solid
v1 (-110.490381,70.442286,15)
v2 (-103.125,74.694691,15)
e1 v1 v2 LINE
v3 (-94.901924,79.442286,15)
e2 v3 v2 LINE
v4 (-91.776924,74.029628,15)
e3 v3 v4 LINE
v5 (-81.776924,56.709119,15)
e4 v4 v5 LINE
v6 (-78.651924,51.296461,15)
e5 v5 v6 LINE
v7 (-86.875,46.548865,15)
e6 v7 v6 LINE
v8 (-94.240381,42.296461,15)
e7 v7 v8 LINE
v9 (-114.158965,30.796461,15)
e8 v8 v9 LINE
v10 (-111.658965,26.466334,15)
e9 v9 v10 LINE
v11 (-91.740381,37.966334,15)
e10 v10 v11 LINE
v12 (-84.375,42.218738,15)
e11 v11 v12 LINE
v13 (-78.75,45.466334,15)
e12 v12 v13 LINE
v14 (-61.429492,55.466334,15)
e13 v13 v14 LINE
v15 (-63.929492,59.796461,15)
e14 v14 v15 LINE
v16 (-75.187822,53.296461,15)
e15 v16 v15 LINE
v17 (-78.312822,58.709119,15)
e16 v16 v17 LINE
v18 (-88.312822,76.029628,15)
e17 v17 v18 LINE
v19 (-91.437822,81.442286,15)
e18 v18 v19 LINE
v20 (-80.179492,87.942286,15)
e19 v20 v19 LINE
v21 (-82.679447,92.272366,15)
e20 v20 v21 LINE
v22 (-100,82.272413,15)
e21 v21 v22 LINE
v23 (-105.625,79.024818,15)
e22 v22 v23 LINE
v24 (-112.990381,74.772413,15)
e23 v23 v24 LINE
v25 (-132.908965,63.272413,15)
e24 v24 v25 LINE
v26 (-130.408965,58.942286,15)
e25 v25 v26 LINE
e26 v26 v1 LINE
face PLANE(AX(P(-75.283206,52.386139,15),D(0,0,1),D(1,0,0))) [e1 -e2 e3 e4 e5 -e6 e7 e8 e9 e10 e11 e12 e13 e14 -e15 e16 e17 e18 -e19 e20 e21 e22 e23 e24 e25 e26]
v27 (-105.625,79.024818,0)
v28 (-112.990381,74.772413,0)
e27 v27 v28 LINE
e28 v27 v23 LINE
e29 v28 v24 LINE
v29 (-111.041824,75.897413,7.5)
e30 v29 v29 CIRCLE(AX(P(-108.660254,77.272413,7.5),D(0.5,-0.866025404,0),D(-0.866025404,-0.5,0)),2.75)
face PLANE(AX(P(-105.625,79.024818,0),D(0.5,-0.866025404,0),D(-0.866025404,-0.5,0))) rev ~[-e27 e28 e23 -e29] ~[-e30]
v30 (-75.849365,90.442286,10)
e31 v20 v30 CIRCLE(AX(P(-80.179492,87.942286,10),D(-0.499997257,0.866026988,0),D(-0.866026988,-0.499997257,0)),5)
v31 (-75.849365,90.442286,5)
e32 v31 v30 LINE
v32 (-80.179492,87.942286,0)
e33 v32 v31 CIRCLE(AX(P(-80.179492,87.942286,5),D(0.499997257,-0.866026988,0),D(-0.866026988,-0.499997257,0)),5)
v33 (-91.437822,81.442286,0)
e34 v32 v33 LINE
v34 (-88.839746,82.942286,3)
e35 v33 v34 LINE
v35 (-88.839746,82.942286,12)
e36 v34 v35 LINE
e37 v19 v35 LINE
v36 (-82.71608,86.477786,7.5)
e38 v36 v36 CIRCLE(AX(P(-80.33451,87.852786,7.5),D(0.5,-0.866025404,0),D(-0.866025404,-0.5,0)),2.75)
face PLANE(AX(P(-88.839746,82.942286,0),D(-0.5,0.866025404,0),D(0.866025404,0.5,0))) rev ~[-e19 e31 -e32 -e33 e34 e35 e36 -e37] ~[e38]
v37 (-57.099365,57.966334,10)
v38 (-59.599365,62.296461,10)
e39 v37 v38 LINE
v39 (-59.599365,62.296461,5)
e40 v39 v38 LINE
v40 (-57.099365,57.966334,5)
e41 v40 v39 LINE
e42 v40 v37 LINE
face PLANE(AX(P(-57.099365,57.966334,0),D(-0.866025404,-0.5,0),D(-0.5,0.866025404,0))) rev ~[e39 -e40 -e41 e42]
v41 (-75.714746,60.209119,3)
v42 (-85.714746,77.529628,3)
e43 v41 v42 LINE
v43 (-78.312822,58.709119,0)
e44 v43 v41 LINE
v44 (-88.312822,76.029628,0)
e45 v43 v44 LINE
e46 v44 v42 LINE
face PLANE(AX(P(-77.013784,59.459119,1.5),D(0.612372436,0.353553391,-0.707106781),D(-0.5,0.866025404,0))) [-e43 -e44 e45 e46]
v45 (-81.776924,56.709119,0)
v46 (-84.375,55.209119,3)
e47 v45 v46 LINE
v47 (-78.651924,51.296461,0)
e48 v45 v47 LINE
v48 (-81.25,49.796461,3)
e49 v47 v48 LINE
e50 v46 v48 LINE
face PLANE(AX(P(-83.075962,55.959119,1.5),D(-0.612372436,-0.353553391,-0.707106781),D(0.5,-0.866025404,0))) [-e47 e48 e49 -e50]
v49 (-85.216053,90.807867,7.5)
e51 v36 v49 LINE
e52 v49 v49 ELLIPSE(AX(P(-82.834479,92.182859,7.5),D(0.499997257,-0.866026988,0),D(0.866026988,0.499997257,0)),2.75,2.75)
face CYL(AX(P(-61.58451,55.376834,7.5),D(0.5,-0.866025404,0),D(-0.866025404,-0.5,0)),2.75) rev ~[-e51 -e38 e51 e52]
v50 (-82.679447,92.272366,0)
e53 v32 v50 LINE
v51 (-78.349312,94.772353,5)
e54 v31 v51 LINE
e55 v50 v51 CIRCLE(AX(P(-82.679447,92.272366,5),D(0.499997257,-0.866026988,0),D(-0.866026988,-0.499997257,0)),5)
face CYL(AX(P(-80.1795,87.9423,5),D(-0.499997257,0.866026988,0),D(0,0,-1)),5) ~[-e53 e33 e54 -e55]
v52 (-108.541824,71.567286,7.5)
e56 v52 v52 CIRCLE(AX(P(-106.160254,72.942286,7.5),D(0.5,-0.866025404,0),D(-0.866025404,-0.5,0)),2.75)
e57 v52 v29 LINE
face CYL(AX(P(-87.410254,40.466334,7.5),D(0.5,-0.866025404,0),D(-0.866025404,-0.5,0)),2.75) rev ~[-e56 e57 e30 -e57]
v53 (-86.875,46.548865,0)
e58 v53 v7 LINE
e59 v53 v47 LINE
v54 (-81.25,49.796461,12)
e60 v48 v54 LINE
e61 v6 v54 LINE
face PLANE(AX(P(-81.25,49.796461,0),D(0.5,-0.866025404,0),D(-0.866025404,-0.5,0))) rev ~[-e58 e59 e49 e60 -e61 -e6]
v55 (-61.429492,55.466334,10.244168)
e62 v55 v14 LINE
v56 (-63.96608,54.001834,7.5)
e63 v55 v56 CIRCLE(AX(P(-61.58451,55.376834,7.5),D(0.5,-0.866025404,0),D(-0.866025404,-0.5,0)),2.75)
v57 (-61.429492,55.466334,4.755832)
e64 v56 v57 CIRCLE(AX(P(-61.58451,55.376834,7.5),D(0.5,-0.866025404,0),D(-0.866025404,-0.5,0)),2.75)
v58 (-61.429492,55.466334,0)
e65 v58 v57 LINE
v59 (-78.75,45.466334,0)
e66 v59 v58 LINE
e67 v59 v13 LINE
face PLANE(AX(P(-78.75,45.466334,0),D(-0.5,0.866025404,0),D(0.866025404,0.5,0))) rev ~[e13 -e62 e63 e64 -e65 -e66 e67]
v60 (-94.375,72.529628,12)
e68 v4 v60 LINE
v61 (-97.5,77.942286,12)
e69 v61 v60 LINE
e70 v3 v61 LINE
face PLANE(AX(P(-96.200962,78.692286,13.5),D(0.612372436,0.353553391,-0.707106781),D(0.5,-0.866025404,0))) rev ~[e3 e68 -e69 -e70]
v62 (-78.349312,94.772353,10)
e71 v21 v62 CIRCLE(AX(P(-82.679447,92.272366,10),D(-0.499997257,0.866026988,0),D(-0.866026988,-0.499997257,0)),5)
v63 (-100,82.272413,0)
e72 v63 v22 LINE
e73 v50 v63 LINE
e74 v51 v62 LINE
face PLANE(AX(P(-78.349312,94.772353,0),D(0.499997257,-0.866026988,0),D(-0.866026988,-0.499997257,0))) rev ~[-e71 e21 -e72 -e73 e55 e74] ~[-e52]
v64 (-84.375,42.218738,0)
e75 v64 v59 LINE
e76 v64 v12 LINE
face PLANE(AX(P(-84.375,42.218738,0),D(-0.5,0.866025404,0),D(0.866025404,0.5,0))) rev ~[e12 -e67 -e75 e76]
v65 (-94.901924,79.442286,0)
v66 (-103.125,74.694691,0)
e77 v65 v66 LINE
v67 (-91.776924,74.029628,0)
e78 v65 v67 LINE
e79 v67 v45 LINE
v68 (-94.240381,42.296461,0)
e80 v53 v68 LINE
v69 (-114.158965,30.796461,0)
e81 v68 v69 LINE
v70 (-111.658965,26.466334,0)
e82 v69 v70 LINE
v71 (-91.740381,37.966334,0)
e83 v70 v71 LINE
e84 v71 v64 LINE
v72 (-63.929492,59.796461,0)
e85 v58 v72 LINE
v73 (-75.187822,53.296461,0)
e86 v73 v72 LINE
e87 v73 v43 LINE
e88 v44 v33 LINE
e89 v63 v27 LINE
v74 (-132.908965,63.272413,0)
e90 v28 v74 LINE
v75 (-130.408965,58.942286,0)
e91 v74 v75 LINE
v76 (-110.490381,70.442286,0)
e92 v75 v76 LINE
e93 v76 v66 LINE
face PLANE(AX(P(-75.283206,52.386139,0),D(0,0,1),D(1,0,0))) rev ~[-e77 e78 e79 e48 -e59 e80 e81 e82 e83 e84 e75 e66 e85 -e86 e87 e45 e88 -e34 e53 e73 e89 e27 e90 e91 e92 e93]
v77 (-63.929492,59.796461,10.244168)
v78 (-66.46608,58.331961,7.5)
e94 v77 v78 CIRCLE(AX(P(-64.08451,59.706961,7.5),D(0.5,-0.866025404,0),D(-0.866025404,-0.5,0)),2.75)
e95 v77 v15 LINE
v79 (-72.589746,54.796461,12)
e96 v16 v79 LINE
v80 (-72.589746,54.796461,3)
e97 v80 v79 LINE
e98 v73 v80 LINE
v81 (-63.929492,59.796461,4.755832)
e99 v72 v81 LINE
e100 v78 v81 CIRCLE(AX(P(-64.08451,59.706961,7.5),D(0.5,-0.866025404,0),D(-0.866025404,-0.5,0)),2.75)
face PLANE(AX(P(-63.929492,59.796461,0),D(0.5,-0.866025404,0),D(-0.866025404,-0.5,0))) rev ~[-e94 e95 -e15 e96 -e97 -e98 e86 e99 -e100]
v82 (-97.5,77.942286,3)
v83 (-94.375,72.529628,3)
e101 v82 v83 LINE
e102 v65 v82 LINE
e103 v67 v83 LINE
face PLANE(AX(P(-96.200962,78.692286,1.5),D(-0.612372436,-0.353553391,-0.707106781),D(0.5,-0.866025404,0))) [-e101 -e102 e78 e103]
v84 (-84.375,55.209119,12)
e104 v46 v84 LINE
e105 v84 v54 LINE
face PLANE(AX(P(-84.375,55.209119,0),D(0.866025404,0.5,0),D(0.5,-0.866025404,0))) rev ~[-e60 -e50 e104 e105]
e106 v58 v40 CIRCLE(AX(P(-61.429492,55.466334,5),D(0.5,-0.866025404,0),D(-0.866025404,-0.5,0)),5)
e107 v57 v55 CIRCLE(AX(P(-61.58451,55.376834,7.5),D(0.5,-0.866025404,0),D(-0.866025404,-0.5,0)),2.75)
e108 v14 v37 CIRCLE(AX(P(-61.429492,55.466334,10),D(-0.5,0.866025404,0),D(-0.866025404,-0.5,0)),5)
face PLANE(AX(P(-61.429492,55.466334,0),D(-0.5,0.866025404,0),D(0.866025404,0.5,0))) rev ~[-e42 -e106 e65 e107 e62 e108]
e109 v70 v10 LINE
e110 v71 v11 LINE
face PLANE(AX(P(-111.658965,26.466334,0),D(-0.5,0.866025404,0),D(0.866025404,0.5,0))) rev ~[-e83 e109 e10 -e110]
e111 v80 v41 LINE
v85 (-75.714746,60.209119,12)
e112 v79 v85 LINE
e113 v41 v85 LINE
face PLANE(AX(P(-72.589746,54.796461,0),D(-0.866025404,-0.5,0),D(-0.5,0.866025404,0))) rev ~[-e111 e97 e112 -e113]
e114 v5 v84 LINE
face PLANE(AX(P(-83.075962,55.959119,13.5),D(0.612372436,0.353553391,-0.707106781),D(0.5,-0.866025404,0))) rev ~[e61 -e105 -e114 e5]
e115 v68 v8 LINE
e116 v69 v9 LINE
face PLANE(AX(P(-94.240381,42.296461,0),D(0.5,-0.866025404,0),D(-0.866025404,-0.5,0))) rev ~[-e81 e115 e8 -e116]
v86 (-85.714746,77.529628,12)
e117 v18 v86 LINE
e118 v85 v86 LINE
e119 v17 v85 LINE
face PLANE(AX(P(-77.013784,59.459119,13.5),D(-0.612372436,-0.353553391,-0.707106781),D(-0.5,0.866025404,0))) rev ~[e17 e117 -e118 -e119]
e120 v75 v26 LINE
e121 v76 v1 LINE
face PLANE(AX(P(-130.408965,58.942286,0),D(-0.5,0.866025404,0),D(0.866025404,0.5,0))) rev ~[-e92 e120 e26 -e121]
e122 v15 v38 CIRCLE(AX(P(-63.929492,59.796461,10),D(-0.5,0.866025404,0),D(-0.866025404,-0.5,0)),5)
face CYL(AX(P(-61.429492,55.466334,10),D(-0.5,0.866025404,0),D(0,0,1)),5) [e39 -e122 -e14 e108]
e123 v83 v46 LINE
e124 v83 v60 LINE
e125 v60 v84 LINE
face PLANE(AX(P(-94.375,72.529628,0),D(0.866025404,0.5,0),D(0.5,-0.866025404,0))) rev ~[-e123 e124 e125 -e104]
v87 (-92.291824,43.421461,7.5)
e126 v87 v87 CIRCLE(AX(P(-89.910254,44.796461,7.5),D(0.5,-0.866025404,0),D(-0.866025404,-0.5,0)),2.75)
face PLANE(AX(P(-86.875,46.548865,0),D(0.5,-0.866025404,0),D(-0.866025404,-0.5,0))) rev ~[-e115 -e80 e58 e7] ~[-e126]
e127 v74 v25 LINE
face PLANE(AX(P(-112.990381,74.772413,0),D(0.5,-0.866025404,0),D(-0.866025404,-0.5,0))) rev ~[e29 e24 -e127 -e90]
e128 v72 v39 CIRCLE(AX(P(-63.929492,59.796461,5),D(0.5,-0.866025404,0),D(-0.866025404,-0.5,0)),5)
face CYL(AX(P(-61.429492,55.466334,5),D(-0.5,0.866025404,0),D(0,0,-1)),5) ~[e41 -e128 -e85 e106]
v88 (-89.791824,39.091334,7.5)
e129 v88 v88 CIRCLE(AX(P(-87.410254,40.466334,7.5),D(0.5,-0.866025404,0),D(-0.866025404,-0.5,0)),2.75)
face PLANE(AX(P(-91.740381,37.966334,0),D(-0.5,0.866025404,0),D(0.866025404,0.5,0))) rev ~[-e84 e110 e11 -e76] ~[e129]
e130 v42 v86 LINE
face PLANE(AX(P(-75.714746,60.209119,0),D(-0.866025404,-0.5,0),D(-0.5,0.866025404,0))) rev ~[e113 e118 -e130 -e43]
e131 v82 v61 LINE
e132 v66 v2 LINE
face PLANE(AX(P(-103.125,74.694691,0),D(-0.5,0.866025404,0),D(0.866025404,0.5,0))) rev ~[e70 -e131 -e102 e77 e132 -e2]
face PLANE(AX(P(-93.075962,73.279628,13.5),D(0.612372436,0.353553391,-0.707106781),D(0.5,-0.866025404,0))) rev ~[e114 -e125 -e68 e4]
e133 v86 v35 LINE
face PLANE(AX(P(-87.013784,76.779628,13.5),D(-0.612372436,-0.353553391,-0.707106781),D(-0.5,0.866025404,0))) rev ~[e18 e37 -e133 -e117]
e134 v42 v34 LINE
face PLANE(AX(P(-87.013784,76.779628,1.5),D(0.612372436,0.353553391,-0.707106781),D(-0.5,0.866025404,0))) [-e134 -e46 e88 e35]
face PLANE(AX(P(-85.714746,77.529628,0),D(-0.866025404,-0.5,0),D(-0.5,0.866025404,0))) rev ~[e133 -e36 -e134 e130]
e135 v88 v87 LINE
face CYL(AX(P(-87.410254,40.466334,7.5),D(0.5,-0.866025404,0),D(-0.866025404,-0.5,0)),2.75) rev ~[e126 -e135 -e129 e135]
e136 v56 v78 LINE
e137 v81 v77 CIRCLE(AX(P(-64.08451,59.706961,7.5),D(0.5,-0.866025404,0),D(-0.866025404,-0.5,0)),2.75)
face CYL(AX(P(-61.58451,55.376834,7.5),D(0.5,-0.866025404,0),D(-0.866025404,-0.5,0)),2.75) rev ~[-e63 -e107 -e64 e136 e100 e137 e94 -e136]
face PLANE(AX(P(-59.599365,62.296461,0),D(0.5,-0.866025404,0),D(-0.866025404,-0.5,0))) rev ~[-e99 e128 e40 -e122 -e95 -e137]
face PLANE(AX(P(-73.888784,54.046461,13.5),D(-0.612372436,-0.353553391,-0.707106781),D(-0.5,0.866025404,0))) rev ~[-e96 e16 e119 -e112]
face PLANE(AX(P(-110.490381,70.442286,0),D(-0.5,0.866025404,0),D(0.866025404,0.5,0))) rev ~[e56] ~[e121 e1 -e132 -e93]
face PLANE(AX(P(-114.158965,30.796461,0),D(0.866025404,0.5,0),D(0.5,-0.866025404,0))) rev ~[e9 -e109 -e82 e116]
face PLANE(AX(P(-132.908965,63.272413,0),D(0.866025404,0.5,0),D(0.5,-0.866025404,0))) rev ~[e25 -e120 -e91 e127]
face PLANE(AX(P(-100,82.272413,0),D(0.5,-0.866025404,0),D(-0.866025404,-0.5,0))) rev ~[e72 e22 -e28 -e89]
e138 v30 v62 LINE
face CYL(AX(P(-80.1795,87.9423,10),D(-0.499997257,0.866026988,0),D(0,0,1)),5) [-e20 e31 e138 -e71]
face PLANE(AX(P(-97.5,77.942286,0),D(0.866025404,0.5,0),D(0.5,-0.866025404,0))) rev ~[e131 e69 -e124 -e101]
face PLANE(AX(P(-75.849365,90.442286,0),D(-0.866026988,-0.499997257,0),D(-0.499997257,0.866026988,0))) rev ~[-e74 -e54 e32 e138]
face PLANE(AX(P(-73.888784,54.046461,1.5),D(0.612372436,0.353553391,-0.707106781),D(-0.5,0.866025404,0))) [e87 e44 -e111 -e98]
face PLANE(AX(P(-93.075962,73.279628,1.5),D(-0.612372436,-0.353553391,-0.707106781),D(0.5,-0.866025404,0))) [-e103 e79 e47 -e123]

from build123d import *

# Parameters (mm, degrees)
F1_DEPTH = 15
F3_DEPTH = 60
F4_SIZE  = 3
F5_R     = 5


with BuildPart() as f1:
    # F0 (on Top) → F1 (new body)
    with BuildSketch(Plane.XY):
        Polygon((-84.375, 42.2187384345), (-78.75, 45.4663336987), (-61.4294919243, 55.4663336987), (-63.9294919243, 59.7964607176), (-72.5897459622, 54.7964607176), (-75.7147459622, 60.2091194913), (-84.375, 55.2091194913), (-81.25, 49.7964607176), (-86.875, 46.5488654534), align=None)
        Polygon((-61.4294919243, 55.4663336987), (-57.0993649054, 57.9663336987), (-59.5993649054, 62.2964607176), (-63.9294919243, 59.7964607176), align=None)
        Polygon((-91.7403810568, 37.9663336987), (-84.375, 42.2187384345), (-86.875, 46.5488654534), (-94.2403810568, 42.2964607176), align=None)
        Polygon((-84.375, 55.2091194913), (-75.7147459622, 60.2091194913), (-85.7147459622, 77.5296275669), (-87.793790014, 76.329290924), (-94.375, 72.5296275669), align=None)
        Polygon((-111.6589653438, 26.4663336987), (-91.7403810568, 37.9663336987), (-94.2403810568, 42.2964607176), (-114.1589653438, 30.7964607176), align=None)
        Polygon((-87.793790014, 76.329290924), (-85.7147459622, 77.5296275669), (-88.8397459622, 82.9422863406), (-75.8493649054, 90.4422863406), (-78.3493115936, 94.7723526968), (-100, 82.2724133595), (-105.625, 79.0248180953), (-103.125, 74.6946910764), (-97.5, 77.9422863406), (-94.375, 72.5296275669), align=None)
        Polygon((-110.4903810568, 70.4422863406), (-103.125, 74.6946910764), (-105.625, 79.0248180953), (-112.9903810568, 74.7724133595), align=None)
        Polygon((-130.4089653438, 58.9422863406), (-110.4903810568, 70.4422863406), (-112.9903810568, 74.7724133595), (-132.9089653438, 63.2724133595), align=None)
    extrude(amount=F1_DEPTH)

    # F2 (on face) → F3 (cut)
    with BuildSketch(Plane(origin=(-39.375, 68.199500548, 0), x_dir=(0.8660254038, 0.5, 0), z_dir=(0.5, -0.8660254038, 0))):
        with BuildLine():
            ThreePointArc((-52.7163336987, 7.5), (-55.4663336987, 10.25), (-58.2163336987, 7.5))
            Line((-58.2163336987, 7.5), (-55.4663336987, 7.5))
            Line((-55.4663336987, 7.5), (-52.7163336987, 7.5))
        make_face()
        with BuildLine():
            Line((-55.4663336987, 7.5), (-58.2163336987, 7.5))
            ThreePointArc((-58.2163336987, 7.5), (-55.4663336987, 4.75), (-52.7163336987, 7.5))
            Line((-52.7163336987, 7.5), (-55.4663336987, 7.5))
        make_face()
        with BuildLine():
            ThreePointArc((-22.8953336987, 7.5), (-25.6453336987, 10.25), (-28.3953336987, 7.5))
            ThreePointArc((-28.3953336987, 7.5), (-25.6453336987, 4.75), (-22.8953336987, 7.5))
        make_face()
    extrude(amount=-F3_DEPTH, mode=Mode.SUBTRACT)

    # F4
    f4_edges = [f1.edges().sort_by_distance(p)[0] for p in [
        (-89.375, 63.869374, 15),
        (-80.714746, 68.869374, 15),
        (-89.375, 63.869374, 0),
        (-80.714746, 68.869374, 0),
    ]]
    chamfer(f4_edges, length=F4_SIZE)

    # F5
    f5_edges = [f1.edges().sort_by_distance(p)[0] for p in [
        (-58.349365, 60.131397, 15),
        (-58.349365, 60.131397, 0),
        (-77.099338, 92.60732, 15),
        (-77.099338, 92.60732, 0),
    ]]
    fillet(f5_edges, radius=F5_R)


solid = f1.part
